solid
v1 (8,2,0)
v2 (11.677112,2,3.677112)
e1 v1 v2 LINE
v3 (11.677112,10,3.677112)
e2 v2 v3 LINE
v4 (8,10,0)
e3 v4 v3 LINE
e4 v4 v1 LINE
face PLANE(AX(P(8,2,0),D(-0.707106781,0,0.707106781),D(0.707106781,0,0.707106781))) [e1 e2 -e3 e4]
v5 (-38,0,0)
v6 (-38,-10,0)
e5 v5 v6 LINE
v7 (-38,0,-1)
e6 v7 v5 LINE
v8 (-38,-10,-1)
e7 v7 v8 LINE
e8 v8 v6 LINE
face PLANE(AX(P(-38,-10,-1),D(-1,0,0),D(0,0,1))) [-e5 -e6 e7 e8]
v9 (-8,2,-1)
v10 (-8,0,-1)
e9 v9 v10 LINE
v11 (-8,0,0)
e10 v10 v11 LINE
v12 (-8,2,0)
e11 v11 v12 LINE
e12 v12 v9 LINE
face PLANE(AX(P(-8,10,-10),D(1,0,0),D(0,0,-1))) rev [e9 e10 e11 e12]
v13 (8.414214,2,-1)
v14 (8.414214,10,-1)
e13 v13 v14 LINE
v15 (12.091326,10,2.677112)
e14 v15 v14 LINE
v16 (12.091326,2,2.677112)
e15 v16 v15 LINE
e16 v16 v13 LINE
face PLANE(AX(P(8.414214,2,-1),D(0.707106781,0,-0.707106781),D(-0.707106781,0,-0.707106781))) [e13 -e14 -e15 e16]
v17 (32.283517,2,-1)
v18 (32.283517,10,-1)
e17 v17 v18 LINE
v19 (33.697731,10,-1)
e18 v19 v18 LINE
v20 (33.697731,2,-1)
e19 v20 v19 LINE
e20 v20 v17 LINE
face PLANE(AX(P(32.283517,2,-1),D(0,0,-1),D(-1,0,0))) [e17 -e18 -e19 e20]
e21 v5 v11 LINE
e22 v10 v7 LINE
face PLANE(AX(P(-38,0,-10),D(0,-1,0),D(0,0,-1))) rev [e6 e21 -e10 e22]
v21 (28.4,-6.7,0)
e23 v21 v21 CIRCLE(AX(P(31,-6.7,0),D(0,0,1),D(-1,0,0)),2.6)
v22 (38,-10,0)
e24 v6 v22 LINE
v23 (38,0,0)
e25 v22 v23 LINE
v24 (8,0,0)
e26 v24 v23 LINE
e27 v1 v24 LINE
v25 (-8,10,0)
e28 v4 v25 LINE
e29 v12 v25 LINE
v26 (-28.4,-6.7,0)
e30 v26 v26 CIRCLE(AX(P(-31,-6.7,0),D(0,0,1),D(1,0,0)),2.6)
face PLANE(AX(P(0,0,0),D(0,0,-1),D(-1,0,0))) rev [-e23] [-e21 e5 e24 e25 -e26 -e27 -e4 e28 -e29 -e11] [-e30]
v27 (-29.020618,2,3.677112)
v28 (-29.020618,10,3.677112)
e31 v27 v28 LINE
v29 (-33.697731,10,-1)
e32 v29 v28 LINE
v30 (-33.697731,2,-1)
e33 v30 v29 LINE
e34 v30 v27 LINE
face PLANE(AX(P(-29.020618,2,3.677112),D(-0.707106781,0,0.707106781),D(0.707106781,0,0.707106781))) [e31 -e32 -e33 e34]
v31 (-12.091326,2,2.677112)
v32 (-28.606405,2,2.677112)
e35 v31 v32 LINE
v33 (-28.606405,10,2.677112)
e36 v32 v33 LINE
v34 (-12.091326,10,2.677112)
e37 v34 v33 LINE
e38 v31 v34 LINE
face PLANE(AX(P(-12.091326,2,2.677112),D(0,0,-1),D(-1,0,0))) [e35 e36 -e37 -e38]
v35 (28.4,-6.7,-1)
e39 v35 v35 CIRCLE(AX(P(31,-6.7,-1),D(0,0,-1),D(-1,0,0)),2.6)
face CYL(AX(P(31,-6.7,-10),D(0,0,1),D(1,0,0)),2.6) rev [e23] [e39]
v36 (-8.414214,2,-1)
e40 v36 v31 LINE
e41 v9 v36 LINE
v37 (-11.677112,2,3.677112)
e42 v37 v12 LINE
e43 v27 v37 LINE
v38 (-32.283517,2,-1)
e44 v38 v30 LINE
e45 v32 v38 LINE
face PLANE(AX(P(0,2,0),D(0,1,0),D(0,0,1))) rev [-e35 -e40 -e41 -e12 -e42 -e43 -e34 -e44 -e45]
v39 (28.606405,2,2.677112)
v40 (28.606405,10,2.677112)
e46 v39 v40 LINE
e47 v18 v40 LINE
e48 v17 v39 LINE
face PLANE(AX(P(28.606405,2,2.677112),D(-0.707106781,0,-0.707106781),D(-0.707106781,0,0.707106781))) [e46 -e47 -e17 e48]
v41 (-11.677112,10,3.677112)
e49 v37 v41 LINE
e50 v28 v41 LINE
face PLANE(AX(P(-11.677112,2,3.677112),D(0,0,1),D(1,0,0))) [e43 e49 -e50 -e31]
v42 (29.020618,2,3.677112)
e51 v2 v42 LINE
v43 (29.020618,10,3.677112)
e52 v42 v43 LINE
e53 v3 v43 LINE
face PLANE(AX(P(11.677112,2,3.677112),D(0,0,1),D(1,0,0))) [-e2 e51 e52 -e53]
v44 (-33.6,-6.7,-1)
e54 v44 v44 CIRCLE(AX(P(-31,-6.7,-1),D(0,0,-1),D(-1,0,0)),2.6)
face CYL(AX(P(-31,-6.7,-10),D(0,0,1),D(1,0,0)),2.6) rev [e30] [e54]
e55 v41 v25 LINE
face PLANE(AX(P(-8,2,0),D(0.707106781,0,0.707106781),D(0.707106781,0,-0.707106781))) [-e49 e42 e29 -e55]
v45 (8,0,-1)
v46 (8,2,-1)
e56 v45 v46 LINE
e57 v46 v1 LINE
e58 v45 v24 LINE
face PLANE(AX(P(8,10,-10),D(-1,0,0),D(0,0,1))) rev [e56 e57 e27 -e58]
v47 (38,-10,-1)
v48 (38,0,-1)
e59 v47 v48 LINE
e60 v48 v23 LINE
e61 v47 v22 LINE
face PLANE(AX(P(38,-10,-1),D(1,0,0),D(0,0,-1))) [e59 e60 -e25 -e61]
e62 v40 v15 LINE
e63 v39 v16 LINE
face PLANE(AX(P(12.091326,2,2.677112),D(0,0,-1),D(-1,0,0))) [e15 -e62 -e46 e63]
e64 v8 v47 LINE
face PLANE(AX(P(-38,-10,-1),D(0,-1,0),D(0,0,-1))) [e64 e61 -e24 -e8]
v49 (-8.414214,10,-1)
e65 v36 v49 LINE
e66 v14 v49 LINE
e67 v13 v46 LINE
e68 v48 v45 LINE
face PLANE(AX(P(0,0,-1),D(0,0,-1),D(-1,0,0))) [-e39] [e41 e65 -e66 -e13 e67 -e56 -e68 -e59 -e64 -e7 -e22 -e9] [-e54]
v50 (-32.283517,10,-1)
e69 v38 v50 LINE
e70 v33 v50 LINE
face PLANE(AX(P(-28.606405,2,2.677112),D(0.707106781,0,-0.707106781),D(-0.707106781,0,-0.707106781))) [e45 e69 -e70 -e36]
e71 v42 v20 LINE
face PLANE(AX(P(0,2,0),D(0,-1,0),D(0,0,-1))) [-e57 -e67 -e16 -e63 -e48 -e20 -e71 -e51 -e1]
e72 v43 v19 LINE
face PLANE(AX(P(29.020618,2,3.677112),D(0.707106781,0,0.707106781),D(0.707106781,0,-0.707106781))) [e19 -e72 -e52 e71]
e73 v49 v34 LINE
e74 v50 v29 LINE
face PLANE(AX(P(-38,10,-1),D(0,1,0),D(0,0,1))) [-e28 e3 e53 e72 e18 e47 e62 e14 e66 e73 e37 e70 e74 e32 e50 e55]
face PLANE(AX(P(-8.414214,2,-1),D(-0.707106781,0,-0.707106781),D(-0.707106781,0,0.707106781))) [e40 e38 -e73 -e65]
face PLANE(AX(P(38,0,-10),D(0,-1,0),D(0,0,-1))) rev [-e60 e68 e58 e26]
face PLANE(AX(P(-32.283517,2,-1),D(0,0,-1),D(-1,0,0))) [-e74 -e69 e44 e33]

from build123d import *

# Parameters (mm, degrees)
SKETCH1_W           = 76
SKETCH1_H           = 20
BASE_FLANGE1_DEPTH  = 1
SKETCH6_R           = 2.6
CUT_EXTRUDE1_DEPTH  = 10
SKETCH7_W           = 30
SKETCH7_H           = 10
CUT_EXTRUDE2_DEPTH  = 10
BOSS_EXTRUDE1_DEPTH = 8


# Sheet-metal steps are written as plain solids
with BuildPart() as part:
    # Sketch1 → Base-Flange1 (new body)
    with BuildSketch(Plane.XY):
        Rectangle(SKETCH1_W, SKETCH1_H)
    extrude(amount=-BASE_FLANGE1_DEPTH)

    # Sketch6 → Cut-Extrude1 (cut)
    with BuildSketch(Plane.XY):
        with Locations((-31, -6.7)):
            Circle(SKETCH6_R)
        with Locations(Location((31, -6.7, 0), (0, 0, 180))):
            Circle(SKETCH6_R)
    extrude(amount=-CUT_EXTRUDE1_DEPTH, mode=Mode.SUBTRACT)

    # Sketch7 → Cut-Extrude2 (cut)
    with BuildSketch(Plane.XY):
        with Locations((-23, 5)):
            Rectangle(SKETCH7_W, SKETCH7_H)
        with Locations((23, 5)):
            Rectangle(SKETCH7_W, SKETCH7_H)
    extrude(amount=-CUT_EXTRUDE2_DEPTH, mode=Mode.SUBTRACT)

    # Sketch8 → Boss-Extrude1 (add)
    with BuildSketch(Plane(origin=(0, 10, 0), x_dir=(1, 0, 0), z_dir=(0, 1, 0))):
        Polygon((8, 0), (11.67711212, -3.67711212), (29.020618382, -3.67711212), (33.697730502, 1), (32.28351694, 1), (28.60640482, -2.67711212), (12.091325682, -2.67711212), (8.414213562, 1), (8, 1), align=None)
        Polygon((-32.28351694, 1), (-33.697730502, 1), (-29.020618382, -3.67711212), (-11.67711212, -3.67711212), (-8, 0), (-8, 1), (-8.414213562, 1), (-12.091325682, -2.67711212), (-28.60640482, -2.67711212), align=None)
    extrude(amount=-BOSS_EXTRUDE1_DEPTH)


solid = part.part
